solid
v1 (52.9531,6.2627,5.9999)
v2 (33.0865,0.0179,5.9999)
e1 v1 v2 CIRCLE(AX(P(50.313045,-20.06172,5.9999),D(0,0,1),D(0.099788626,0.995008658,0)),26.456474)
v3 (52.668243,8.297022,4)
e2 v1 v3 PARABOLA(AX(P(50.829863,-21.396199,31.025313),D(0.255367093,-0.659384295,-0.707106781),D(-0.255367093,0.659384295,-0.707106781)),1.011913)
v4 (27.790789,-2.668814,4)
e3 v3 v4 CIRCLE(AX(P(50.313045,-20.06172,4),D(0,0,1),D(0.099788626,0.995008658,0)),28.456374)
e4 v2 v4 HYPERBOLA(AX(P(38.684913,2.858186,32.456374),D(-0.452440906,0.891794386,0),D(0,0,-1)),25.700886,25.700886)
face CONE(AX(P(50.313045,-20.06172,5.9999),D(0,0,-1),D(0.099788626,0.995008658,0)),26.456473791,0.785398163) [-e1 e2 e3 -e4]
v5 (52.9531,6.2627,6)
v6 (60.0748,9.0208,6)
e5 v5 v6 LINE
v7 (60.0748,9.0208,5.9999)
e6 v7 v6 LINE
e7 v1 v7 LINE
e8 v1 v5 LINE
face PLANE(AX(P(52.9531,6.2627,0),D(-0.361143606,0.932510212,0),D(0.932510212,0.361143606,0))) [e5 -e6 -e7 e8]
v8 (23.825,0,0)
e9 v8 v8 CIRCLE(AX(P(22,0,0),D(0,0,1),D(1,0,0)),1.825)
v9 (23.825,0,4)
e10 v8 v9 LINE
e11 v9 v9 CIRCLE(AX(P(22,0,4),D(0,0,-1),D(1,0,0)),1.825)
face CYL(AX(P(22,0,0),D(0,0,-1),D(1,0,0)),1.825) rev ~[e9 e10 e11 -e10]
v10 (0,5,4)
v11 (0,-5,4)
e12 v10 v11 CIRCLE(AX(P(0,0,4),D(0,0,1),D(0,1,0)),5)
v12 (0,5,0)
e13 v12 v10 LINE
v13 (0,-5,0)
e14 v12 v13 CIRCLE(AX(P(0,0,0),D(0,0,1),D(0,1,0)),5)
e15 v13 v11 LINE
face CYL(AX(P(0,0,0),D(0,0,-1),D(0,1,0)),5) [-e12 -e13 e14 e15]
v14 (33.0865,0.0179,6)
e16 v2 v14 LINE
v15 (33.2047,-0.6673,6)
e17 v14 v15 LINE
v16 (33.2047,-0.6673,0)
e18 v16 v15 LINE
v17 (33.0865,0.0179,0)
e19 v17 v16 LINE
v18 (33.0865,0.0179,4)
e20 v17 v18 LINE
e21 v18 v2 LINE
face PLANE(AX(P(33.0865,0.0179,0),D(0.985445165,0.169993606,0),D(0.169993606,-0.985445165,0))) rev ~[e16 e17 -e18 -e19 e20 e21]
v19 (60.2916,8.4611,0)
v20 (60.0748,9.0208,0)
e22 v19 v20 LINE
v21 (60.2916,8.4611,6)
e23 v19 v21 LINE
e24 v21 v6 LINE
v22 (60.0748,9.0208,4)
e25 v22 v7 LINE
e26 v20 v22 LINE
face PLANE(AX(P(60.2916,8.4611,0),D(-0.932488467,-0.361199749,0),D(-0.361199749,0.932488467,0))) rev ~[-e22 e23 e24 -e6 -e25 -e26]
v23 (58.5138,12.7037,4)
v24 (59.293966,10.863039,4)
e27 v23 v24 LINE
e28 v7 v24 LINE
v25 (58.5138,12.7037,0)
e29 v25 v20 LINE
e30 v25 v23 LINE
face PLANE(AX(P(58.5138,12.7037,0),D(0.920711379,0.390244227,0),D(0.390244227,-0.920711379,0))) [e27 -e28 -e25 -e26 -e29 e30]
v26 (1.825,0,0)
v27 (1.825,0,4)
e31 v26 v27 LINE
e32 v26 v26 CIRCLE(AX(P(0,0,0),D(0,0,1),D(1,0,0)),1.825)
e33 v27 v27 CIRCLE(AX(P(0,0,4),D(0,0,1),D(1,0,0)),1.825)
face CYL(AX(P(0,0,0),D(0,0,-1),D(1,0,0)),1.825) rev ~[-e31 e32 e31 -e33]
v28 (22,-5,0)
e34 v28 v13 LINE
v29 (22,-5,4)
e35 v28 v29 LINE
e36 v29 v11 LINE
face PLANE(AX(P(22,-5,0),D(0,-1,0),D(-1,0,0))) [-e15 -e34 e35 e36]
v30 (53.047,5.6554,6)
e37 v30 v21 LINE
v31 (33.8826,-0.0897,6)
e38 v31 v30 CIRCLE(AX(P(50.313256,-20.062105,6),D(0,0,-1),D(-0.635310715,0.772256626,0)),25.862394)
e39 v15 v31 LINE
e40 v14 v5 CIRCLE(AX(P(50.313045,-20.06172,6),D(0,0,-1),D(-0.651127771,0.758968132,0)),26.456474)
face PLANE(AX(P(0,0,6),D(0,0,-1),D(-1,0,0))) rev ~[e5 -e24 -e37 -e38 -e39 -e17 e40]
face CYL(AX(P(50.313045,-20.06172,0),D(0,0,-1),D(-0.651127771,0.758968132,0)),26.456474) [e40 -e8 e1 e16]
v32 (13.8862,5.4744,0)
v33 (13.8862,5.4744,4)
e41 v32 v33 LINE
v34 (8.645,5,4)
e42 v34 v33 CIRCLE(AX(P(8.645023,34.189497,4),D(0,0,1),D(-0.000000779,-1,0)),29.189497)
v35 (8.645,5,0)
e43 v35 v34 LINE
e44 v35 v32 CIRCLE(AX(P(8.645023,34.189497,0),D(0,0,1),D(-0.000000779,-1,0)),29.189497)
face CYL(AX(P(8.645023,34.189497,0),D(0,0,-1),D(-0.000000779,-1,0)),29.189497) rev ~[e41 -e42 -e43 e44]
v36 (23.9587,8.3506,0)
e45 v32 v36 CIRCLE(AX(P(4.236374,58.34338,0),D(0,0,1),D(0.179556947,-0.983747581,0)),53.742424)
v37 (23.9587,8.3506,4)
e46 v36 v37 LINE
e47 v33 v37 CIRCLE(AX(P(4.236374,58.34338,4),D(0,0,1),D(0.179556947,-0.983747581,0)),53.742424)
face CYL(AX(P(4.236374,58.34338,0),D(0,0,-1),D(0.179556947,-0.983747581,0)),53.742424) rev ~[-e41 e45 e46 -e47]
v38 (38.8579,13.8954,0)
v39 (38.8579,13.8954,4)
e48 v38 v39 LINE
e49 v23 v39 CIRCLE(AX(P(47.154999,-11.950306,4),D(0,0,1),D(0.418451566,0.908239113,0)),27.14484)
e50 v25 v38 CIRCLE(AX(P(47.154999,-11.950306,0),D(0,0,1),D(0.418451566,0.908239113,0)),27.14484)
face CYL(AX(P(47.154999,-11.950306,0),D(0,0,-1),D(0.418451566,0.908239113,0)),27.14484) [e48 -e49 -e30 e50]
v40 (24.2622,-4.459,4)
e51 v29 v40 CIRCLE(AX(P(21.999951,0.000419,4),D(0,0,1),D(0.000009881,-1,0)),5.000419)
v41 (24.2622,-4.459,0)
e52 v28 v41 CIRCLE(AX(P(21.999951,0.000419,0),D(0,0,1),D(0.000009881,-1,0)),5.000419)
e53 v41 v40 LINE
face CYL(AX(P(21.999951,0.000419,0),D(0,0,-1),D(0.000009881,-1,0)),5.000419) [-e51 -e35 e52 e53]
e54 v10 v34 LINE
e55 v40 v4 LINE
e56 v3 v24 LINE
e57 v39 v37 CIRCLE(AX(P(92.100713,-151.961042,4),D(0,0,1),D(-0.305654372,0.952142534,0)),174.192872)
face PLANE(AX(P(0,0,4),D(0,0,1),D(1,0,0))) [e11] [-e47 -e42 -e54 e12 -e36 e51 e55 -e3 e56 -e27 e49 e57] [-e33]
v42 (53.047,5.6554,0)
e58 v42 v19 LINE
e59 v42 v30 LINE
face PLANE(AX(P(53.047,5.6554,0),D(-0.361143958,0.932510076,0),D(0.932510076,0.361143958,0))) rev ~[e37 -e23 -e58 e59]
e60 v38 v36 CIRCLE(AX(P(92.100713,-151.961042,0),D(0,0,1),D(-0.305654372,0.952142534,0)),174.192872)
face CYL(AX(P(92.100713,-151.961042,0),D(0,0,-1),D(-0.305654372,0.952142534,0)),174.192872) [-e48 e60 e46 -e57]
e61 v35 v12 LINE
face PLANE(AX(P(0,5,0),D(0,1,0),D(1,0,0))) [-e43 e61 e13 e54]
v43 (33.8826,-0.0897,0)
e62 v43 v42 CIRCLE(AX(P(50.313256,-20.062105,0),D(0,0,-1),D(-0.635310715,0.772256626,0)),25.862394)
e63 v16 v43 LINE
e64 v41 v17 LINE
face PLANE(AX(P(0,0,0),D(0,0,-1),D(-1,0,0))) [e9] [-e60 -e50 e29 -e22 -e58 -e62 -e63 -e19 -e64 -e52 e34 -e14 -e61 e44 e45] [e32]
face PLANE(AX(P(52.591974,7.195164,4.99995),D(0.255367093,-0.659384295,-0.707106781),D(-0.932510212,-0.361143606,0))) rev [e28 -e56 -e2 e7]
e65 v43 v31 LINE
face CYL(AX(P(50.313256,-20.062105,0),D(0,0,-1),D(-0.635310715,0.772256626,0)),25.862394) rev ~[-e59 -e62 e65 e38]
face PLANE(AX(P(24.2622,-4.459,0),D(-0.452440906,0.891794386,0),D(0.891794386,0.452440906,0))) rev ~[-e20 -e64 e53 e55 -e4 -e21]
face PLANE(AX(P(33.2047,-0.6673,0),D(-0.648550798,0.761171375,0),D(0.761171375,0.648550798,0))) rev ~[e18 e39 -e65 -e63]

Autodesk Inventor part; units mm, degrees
ref_plane "YZ Plane" through (0, 0, 0) normal (1, 0, 0) x (0, 1, 0)
ref_plane "XZ Plane" through (0, 0, 0) normal (0, 1, 0) x (-1, 0, 0)
ref_plane "XY Plane" through (0, 0, 0) normal (0, 0, 1) x (1, 0, 0)
sketch "Náčrt1" plane through (0, 0, 0) normal (0, 0, 1) x (1, 0, 0)
  circle A0 centre (0, 0) radius 1.825
  circle A1 centre (22, 0) radius 1.825
  arc A2 (0, 5) -> (0, -5) centre (0, 0) ccw
  line L0 (0, 0) -> (-0.516, 0)
  line L1 (0, 5) -> (8.645, 5)
  arc A3 (8.645, 5) -> (13.8862, 5.4744) centre (8.645, 34.19) ccw
  arc A4 (8.645, 5) -> (8.645, 5) centre (6.8603, 48.5893) ccw
  arc A5 (58.5138, 12.7037) -> (38.8579, 13.8954) centre (47.1549, -11.9507) ccw
  line L2 (22, -5) -> (0, -5)
  line L3 (24.2622, -4.459) -> (33.0865, 0.0179)
  line L4 (22, 0) -> (22, 6.29)
  line L5 (58.5138, 12.7037) -> (60.0748, 9.0208)
  arc A6 (52.9531, 6.2627) -> (33.0865, 0.0179) centre (50.3132, -20.062) ccw
  arc A7 (22, -5) -> (24.2622, -4.459) centre (22, 0) ccw
  line L6 (52.9531, 6.2627) -> (60.0748, 9.0208)
  line L7 (23.9587, 8.3506) -> (22.7174, 7.8453)
  arc A8 (38.8579, 13.8954) -> (23.9587, 8.3506) centre (92.1034, -151.9688) ccw
  arc A9 (13.8862, 5.4744) -> (23.9587, 8.3506) centre (4.237, 58.3407) ccw
  dimension "d0" = 3.65
  dimension "d2" = 3.65
  dimension "d3" = 10
  dimension "d8" = 0.516
  dimension "d17" = 9.895
  dimension "d18" = 63.1
  dimension "d19" = 20.825
  dimension "d21" = 4
extrude "Vysunutí1" add sketch "Náčrt1" along normal blind 4 contours L1 A4 A3 A9 A8 A5 L5 L6 A6 L3 A7 L2 A2 | L1 A4 picked at (7.0586, 4.9892)
sketch "Náčrt3" plane through (0, 0, 0) normal (0, 0, -1) x (-1, 0, 0)
  arc A0 (-33.8826, -0.0897) -> (-53.047, 5.6554) centre (-50.3132, -20.062) ccw
  arc A1 (-33.0865, 0.0179) -> (-52.9531, 6.2627) centre (-50.3132, -20.062) ccw projected
  arc A2 (-33.0865, 0.0179) -> (-52.9531, 6.2627) centre (-50.3132, -20.062) ccw projected
  line L0 (-33.0865, 0.0179) -> (-33.0865, 0.0179)
  line L1 (-24.2622, -4.459) -> (-33.0865, 0.0179) projected
  line L2 (-33.0865, 0.0179) -> (-33.2047, -0.6673)
  line L3 (-33.2047, -0.6673) -> (-33.8826, -0.0897)
  line L4 (-53.047, 5.6554) -> (-60.2916, 8.4611)
  line L5 (-52.9531, 6.2627) -> (-60.0748, 9.0208) projected
  line L6 (-60.2916, 8.4611) -> (-60.0748, 9.0208)
  line L7 (-60.0748, 9.0208) -> (-52.9531, 6.2627)
  point P0 (0, 0)
extrude "Vysunutí3" add sketch "Náčrt3" against normal blind 6
chamfer "Zkosení2" distance 2 angle 45 2 edges at (42.3795, 5.1772, 4) (56.514, 7.6418, 4)
sketch "Náčrt6" plane through (0, 0, 0) normal (0, 0, -1) x (-1, 0, 0)
  point P0 (0, 0)
properties part number "lapak" material "ABS Plastic"
